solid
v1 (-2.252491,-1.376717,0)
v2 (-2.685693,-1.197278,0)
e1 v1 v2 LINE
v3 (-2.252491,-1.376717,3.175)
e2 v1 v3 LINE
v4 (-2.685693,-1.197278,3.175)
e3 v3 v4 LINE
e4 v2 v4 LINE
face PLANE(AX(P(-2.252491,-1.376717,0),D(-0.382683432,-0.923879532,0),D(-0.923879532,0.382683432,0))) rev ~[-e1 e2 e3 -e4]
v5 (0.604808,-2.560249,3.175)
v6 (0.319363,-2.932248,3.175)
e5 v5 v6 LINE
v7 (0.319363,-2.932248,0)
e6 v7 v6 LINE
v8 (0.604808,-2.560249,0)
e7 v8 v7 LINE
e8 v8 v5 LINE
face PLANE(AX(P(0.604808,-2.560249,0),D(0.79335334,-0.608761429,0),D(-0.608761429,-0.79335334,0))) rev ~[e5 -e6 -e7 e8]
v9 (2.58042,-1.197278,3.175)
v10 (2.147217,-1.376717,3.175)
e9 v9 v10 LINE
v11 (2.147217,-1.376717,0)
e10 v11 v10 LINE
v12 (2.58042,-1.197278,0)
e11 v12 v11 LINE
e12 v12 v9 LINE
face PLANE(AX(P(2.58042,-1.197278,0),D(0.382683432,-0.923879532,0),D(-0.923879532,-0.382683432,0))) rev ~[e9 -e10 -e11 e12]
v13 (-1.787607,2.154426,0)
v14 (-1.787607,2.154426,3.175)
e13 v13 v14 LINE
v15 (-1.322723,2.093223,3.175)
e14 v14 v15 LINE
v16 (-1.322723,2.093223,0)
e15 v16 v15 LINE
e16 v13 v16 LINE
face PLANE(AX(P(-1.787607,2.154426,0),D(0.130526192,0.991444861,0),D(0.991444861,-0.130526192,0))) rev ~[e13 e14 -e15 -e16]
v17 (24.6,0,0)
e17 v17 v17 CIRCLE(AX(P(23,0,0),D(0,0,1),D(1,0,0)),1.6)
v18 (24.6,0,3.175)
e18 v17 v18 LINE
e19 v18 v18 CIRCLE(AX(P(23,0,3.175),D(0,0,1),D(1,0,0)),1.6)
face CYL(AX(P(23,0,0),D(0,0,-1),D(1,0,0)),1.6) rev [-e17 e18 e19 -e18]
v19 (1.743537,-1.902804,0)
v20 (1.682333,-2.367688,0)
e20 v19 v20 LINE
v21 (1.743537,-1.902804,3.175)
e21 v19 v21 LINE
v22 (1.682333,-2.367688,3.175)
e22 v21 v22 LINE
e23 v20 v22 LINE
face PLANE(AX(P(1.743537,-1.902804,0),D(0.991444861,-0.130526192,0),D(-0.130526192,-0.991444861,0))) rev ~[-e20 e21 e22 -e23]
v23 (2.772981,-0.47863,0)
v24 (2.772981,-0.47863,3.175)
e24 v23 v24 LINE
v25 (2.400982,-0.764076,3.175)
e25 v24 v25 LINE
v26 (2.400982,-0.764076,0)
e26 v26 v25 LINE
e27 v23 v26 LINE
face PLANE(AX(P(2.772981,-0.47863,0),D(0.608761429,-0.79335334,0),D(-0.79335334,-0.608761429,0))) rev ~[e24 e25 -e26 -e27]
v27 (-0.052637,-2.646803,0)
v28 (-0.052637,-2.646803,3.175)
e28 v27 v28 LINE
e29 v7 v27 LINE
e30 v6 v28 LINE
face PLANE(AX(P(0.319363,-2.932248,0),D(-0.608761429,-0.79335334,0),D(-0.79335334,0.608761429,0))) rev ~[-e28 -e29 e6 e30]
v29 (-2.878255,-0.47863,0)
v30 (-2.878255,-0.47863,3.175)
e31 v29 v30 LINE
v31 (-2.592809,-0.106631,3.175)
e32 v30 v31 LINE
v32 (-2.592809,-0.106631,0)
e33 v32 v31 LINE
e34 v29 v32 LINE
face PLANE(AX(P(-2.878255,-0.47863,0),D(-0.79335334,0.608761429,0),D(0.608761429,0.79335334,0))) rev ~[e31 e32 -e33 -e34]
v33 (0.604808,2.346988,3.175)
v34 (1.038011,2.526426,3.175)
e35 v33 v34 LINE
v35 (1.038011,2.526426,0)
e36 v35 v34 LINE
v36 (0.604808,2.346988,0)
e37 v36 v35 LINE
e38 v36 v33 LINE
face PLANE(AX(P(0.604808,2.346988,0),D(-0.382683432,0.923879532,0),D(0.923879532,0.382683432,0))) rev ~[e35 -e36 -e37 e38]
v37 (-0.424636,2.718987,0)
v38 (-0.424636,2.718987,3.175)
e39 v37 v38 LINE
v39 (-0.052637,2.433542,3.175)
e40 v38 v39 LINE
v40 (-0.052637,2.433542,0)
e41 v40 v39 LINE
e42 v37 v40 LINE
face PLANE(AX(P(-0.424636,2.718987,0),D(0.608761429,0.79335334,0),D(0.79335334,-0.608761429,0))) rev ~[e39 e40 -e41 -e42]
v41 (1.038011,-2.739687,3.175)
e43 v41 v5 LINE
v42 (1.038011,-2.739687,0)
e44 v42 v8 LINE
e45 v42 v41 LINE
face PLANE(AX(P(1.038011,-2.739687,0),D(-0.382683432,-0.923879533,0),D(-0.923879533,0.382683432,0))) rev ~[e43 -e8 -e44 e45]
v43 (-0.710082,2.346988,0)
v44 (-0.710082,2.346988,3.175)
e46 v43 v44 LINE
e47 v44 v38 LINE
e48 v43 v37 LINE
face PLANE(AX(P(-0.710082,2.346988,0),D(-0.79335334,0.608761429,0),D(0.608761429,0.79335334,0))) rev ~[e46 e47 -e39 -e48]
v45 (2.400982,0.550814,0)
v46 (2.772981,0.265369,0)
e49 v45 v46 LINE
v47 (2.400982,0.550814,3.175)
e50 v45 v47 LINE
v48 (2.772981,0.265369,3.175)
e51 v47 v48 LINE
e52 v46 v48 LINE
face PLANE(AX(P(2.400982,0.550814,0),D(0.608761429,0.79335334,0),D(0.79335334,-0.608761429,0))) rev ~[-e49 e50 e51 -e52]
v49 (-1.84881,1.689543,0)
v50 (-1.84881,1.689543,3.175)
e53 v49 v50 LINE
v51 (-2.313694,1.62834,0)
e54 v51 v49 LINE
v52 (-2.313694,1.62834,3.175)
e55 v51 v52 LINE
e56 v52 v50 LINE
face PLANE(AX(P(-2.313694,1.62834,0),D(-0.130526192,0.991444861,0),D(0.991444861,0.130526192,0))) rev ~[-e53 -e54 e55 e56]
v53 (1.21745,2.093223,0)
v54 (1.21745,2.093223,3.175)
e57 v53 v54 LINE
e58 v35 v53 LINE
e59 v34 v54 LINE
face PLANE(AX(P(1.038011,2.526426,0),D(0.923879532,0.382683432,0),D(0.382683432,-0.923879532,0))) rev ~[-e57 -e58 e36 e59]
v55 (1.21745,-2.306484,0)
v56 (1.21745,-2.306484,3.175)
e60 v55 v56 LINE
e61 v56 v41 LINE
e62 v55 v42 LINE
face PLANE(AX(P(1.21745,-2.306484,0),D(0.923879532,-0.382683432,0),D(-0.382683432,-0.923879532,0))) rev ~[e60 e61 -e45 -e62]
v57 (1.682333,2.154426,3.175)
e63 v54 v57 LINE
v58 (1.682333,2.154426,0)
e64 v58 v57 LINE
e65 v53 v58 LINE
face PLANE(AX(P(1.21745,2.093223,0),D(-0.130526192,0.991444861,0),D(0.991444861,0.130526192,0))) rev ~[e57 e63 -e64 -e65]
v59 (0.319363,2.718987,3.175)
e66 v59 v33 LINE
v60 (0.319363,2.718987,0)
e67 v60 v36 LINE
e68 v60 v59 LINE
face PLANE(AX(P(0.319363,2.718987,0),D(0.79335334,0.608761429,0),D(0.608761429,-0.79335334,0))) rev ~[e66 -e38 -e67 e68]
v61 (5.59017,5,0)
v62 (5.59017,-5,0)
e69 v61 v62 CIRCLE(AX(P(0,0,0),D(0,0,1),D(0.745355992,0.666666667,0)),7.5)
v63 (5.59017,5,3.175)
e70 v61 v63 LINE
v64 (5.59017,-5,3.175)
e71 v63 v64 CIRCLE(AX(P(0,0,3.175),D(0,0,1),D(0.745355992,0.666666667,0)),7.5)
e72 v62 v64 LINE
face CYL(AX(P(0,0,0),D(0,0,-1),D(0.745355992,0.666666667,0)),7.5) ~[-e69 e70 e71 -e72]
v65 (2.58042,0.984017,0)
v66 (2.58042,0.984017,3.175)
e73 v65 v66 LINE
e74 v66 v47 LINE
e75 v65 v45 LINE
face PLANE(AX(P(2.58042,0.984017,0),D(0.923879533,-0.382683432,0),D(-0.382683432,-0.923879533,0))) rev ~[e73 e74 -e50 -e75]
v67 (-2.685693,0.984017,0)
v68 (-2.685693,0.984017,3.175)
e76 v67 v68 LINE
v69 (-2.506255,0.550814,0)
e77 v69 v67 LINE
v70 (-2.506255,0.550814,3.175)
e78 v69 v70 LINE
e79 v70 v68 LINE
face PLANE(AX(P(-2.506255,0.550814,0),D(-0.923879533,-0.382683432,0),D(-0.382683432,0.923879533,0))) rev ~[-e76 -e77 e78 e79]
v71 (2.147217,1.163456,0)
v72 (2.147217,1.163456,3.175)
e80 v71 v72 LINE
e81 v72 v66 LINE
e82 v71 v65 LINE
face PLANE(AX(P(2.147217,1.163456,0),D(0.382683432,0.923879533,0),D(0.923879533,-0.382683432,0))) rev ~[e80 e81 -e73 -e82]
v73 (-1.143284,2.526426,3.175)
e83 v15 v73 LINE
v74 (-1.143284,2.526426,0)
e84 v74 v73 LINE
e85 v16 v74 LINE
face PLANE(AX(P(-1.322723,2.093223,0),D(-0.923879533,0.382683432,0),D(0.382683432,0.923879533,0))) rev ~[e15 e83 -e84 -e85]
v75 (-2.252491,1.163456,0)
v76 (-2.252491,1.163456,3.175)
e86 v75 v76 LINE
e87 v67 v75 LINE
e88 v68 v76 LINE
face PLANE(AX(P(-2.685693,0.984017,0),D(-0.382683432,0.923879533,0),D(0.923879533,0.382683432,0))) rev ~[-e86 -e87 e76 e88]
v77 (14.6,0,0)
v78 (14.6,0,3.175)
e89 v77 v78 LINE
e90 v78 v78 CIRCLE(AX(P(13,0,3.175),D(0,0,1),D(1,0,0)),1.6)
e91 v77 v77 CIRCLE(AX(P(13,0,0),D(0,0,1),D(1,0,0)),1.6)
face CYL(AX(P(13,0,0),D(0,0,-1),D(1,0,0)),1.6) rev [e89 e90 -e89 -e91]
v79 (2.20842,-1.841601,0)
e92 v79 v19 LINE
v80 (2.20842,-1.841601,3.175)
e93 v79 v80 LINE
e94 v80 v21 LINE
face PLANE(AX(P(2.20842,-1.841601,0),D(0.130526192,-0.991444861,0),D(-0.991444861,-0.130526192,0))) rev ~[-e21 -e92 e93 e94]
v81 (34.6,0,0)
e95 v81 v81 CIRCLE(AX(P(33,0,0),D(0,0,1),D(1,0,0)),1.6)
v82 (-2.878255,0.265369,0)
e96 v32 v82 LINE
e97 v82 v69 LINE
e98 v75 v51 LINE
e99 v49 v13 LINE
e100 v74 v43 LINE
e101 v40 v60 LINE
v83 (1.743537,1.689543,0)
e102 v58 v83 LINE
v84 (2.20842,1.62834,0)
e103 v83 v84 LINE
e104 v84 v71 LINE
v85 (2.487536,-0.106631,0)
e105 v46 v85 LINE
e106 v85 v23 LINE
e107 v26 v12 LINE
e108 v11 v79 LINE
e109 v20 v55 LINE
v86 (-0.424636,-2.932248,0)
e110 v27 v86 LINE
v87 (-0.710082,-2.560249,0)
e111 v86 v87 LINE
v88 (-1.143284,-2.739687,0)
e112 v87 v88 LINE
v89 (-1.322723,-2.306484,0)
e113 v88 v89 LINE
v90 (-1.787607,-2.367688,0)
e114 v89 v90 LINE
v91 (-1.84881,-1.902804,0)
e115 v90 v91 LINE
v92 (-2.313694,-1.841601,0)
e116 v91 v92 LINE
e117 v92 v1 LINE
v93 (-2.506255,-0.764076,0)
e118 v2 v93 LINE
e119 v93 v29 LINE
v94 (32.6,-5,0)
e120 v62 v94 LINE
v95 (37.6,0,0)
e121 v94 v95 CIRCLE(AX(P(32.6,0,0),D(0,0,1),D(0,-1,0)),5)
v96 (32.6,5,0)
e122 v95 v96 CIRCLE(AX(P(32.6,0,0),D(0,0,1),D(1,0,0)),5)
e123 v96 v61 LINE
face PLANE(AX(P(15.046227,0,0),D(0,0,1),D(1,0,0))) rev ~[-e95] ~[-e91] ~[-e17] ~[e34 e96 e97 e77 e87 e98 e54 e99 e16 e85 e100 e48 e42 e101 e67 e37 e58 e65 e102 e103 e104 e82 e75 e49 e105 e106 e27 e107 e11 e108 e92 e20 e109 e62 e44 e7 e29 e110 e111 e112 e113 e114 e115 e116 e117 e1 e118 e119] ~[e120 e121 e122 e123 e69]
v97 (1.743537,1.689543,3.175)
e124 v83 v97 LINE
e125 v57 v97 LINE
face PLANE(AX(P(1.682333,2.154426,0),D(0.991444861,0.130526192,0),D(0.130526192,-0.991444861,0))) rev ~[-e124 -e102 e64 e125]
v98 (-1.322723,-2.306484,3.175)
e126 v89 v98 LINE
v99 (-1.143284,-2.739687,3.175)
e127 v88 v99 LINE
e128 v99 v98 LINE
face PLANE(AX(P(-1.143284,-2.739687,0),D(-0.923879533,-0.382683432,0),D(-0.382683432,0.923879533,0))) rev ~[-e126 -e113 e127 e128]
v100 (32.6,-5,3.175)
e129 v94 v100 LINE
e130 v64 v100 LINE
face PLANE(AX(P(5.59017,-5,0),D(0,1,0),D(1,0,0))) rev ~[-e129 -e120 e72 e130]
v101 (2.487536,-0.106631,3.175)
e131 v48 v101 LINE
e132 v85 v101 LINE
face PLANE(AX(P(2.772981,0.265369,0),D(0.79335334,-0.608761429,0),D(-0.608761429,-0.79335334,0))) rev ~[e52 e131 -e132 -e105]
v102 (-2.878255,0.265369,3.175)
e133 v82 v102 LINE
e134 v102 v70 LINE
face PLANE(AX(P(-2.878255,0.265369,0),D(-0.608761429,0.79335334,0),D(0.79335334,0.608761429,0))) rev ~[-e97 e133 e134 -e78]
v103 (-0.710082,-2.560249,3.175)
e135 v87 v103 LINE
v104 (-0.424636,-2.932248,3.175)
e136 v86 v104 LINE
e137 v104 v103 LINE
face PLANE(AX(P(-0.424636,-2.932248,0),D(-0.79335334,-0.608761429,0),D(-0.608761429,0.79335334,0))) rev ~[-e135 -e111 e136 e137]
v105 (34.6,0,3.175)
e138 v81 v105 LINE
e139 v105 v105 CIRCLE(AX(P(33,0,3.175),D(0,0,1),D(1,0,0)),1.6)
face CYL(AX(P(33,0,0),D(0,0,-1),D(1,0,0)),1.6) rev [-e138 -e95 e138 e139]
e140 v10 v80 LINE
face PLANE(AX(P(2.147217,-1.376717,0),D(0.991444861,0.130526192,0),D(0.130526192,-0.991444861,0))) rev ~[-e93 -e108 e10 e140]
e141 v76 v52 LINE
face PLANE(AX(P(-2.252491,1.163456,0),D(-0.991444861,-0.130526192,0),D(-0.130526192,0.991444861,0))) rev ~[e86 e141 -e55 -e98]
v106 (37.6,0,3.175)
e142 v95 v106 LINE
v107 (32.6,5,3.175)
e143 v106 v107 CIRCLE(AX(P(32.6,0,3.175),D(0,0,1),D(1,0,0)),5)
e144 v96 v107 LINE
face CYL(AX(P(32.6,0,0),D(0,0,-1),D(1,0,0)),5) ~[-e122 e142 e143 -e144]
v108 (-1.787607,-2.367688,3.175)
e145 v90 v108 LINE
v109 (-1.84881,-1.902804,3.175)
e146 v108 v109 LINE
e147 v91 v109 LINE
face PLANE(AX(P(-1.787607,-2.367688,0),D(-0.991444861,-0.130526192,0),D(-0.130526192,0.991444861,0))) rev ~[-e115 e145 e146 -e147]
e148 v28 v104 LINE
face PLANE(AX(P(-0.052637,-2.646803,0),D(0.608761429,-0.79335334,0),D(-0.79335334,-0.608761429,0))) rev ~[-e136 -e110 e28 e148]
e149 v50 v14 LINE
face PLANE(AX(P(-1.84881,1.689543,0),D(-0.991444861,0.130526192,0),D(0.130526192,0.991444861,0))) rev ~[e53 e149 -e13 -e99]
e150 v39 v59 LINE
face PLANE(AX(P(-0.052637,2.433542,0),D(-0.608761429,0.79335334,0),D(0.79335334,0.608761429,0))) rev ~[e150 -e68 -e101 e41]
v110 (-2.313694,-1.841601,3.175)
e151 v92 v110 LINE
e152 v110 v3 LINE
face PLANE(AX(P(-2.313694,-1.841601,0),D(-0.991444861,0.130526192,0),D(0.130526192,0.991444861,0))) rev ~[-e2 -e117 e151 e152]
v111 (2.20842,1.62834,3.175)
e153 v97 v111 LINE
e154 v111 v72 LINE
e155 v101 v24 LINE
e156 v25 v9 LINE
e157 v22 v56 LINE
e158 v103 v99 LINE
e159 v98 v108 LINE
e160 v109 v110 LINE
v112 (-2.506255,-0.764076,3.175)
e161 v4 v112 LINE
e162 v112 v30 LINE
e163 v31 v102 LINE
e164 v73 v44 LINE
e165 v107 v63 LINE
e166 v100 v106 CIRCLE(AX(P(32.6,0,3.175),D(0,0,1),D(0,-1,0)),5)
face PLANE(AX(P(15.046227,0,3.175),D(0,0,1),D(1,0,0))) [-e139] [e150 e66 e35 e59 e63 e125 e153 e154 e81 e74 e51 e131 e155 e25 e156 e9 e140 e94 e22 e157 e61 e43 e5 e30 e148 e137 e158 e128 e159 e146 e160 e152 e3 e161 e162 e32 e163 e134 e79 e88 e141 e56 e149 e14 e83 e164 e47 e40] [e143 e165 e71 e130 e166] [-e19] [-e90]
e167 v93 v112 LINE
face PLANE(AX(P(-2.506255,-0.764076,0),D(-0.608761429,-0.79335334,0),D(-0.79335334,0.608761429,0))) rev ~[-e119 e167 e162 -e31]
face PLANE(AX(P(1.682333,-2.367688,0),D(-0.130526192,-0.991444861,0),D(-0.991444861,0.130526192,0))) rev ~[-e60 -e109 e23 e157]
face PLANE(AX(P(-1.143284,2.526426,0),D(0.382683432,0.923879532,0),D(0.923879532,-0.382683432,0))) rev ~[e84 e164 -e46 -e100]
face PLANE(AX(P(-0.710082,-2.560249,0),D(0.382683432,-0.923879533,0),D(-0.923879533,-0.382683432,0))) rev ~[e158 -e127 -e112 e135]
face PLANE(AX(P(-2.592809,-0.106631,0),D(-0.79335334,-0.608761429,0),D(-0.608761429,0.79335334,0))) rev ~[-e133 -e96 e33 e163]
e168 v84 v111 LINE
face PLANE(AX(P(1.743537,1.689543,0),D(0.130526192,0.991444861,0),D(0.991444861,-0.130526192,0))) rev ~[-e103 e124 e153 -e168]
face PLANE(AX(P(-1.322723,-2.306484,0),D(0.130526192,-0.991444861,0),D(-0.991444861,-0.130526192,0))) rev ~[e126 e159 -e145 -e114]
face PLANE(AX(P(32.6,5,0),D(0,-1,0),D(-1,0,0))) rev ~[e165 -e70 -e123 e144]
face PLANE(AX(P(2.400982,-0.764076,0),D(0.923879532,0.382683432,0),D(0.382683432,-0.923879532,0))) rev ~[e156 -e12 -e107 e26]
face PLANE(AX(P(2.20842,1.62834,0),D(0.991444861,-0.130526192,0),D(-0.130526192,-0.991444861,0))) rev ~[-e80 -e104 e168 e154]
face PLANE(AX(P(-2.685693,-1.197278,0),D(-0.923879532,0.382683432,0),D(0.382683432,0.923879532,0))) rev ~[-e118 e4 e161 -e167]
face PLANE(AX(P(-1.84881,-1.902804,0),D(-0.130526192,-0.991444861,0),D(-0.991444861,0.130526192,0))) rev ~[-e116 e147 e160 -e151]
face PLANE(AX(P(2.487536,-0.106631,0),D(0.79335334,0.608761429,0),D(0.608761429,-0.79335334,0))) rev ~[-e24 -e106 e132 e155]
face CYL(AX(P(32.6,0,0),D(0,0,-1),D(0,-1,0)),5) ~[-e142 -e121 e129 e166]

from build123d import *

# Parameters (mm, degrees)
F0_R     = 1.6
F1_DEPTH = 3.175


# Not quite as in the source:
# - a feature names something its author has since deleted; it is built from what else it names


with BuildPart() as f1:
    # F0 (on Top) → F1 (new body)
    with BuildSketch(Plane.XY):
        with BuildLine():
            Line((32.6, 5), (5.5901699437, 5))
            ThreePointArc((5.5901699437, 5), (-7.5, 0), (5.5901699437, -5))
            Line((5.5901699437, -5), (32.6, -5))
            ThreePointArc((32.6, -5), (36.1355339059, -3.5355339059), (37.6, 0))
            ThreePointArc((37.6, 0), (36.1355339059, 3.5355339059), (32.6, 5))
        make_face()
        Polygon((-0.4246363361, 2.7189872831), (-0.0526366882, 2.4335419138), (0.3193629596, 2.7189872831), (0.6048083289, 2.3469876353), (1.038011094, 2.5264260959), (1.2174495546, 2.0932233308), (1.6823333844, 2.154426448), (1.7435365017, 1.6895426182), (2.2084203316, 1.6283395009), (2.1472172143, 1.163455671), (2.5804199794, 0.9840172105), (2.4009815188, 0.5508144453), (2.7729811667, 0.265369076), (2.4875357974, -0.1066305718), (2.7729811667, -0.4786302196), (2.4009815188, -0.7640755889), (2.5804199794, -1.197278354), (2.1472172143, -1.3767168146), (2.2084203316, -1.8416006445), (1.7435365017, -1.9028037618), (1.6823333844, -2.3676875916), (1.2174495546, -2.3064844743), (1.038011094, -2.7396872394), (0.6048083289, -2.5602487789), (0.3193629596, -2.9322484267), (-0.0526366882, -2.6468030574), (-0.4246363361, -2.9322484267), (-0.7100817054, -2.5602487789), (-1.1432844705, -2.7396872394), (-1.322722931, -2.3064844743), (-1.7876067609, -2.3676875916), (-1.8488098782, -1.9028037618), (-2.3136937081, -1.8416006445), (-2.2524905908, -1.3767168146), (-2.6856933559, -1.197278354), (-2.5062548953, -0.7640755889), (-2.8782545432, -0.4786302196), (-2.5928091739, -0.1066305718), (-2.8782545432, 0.265369076), (-2.5062548953, 0.5508144453), (-2.6856933559, 0.9840172105), (-2.2524905908, 1.163455671), (-2.3136937081, 1.6283395009), (-1.8488098782, 1.6895426182), (-1.7876067609, 2.154426448), (-1.322722931, 2.0932233308), (-1.1432844705, 2.5264260959), (-0.7100817054, 2.3469876353), align=None, mode=Mode.SUBTRACT)
        with Locations((13, 0)):
            Circle(F0_R, mode=Mode.SUBTRACT)
        with Locations((23, 0)):
            Circle(F0_R, mode=Mode.SUBTRACT)
        with Locations((33, 0)):
            Circle(F0_R, mode=Mode.SUBTRACT)
    extrude(amount=F1_DEPTH)


solid = f1.part
